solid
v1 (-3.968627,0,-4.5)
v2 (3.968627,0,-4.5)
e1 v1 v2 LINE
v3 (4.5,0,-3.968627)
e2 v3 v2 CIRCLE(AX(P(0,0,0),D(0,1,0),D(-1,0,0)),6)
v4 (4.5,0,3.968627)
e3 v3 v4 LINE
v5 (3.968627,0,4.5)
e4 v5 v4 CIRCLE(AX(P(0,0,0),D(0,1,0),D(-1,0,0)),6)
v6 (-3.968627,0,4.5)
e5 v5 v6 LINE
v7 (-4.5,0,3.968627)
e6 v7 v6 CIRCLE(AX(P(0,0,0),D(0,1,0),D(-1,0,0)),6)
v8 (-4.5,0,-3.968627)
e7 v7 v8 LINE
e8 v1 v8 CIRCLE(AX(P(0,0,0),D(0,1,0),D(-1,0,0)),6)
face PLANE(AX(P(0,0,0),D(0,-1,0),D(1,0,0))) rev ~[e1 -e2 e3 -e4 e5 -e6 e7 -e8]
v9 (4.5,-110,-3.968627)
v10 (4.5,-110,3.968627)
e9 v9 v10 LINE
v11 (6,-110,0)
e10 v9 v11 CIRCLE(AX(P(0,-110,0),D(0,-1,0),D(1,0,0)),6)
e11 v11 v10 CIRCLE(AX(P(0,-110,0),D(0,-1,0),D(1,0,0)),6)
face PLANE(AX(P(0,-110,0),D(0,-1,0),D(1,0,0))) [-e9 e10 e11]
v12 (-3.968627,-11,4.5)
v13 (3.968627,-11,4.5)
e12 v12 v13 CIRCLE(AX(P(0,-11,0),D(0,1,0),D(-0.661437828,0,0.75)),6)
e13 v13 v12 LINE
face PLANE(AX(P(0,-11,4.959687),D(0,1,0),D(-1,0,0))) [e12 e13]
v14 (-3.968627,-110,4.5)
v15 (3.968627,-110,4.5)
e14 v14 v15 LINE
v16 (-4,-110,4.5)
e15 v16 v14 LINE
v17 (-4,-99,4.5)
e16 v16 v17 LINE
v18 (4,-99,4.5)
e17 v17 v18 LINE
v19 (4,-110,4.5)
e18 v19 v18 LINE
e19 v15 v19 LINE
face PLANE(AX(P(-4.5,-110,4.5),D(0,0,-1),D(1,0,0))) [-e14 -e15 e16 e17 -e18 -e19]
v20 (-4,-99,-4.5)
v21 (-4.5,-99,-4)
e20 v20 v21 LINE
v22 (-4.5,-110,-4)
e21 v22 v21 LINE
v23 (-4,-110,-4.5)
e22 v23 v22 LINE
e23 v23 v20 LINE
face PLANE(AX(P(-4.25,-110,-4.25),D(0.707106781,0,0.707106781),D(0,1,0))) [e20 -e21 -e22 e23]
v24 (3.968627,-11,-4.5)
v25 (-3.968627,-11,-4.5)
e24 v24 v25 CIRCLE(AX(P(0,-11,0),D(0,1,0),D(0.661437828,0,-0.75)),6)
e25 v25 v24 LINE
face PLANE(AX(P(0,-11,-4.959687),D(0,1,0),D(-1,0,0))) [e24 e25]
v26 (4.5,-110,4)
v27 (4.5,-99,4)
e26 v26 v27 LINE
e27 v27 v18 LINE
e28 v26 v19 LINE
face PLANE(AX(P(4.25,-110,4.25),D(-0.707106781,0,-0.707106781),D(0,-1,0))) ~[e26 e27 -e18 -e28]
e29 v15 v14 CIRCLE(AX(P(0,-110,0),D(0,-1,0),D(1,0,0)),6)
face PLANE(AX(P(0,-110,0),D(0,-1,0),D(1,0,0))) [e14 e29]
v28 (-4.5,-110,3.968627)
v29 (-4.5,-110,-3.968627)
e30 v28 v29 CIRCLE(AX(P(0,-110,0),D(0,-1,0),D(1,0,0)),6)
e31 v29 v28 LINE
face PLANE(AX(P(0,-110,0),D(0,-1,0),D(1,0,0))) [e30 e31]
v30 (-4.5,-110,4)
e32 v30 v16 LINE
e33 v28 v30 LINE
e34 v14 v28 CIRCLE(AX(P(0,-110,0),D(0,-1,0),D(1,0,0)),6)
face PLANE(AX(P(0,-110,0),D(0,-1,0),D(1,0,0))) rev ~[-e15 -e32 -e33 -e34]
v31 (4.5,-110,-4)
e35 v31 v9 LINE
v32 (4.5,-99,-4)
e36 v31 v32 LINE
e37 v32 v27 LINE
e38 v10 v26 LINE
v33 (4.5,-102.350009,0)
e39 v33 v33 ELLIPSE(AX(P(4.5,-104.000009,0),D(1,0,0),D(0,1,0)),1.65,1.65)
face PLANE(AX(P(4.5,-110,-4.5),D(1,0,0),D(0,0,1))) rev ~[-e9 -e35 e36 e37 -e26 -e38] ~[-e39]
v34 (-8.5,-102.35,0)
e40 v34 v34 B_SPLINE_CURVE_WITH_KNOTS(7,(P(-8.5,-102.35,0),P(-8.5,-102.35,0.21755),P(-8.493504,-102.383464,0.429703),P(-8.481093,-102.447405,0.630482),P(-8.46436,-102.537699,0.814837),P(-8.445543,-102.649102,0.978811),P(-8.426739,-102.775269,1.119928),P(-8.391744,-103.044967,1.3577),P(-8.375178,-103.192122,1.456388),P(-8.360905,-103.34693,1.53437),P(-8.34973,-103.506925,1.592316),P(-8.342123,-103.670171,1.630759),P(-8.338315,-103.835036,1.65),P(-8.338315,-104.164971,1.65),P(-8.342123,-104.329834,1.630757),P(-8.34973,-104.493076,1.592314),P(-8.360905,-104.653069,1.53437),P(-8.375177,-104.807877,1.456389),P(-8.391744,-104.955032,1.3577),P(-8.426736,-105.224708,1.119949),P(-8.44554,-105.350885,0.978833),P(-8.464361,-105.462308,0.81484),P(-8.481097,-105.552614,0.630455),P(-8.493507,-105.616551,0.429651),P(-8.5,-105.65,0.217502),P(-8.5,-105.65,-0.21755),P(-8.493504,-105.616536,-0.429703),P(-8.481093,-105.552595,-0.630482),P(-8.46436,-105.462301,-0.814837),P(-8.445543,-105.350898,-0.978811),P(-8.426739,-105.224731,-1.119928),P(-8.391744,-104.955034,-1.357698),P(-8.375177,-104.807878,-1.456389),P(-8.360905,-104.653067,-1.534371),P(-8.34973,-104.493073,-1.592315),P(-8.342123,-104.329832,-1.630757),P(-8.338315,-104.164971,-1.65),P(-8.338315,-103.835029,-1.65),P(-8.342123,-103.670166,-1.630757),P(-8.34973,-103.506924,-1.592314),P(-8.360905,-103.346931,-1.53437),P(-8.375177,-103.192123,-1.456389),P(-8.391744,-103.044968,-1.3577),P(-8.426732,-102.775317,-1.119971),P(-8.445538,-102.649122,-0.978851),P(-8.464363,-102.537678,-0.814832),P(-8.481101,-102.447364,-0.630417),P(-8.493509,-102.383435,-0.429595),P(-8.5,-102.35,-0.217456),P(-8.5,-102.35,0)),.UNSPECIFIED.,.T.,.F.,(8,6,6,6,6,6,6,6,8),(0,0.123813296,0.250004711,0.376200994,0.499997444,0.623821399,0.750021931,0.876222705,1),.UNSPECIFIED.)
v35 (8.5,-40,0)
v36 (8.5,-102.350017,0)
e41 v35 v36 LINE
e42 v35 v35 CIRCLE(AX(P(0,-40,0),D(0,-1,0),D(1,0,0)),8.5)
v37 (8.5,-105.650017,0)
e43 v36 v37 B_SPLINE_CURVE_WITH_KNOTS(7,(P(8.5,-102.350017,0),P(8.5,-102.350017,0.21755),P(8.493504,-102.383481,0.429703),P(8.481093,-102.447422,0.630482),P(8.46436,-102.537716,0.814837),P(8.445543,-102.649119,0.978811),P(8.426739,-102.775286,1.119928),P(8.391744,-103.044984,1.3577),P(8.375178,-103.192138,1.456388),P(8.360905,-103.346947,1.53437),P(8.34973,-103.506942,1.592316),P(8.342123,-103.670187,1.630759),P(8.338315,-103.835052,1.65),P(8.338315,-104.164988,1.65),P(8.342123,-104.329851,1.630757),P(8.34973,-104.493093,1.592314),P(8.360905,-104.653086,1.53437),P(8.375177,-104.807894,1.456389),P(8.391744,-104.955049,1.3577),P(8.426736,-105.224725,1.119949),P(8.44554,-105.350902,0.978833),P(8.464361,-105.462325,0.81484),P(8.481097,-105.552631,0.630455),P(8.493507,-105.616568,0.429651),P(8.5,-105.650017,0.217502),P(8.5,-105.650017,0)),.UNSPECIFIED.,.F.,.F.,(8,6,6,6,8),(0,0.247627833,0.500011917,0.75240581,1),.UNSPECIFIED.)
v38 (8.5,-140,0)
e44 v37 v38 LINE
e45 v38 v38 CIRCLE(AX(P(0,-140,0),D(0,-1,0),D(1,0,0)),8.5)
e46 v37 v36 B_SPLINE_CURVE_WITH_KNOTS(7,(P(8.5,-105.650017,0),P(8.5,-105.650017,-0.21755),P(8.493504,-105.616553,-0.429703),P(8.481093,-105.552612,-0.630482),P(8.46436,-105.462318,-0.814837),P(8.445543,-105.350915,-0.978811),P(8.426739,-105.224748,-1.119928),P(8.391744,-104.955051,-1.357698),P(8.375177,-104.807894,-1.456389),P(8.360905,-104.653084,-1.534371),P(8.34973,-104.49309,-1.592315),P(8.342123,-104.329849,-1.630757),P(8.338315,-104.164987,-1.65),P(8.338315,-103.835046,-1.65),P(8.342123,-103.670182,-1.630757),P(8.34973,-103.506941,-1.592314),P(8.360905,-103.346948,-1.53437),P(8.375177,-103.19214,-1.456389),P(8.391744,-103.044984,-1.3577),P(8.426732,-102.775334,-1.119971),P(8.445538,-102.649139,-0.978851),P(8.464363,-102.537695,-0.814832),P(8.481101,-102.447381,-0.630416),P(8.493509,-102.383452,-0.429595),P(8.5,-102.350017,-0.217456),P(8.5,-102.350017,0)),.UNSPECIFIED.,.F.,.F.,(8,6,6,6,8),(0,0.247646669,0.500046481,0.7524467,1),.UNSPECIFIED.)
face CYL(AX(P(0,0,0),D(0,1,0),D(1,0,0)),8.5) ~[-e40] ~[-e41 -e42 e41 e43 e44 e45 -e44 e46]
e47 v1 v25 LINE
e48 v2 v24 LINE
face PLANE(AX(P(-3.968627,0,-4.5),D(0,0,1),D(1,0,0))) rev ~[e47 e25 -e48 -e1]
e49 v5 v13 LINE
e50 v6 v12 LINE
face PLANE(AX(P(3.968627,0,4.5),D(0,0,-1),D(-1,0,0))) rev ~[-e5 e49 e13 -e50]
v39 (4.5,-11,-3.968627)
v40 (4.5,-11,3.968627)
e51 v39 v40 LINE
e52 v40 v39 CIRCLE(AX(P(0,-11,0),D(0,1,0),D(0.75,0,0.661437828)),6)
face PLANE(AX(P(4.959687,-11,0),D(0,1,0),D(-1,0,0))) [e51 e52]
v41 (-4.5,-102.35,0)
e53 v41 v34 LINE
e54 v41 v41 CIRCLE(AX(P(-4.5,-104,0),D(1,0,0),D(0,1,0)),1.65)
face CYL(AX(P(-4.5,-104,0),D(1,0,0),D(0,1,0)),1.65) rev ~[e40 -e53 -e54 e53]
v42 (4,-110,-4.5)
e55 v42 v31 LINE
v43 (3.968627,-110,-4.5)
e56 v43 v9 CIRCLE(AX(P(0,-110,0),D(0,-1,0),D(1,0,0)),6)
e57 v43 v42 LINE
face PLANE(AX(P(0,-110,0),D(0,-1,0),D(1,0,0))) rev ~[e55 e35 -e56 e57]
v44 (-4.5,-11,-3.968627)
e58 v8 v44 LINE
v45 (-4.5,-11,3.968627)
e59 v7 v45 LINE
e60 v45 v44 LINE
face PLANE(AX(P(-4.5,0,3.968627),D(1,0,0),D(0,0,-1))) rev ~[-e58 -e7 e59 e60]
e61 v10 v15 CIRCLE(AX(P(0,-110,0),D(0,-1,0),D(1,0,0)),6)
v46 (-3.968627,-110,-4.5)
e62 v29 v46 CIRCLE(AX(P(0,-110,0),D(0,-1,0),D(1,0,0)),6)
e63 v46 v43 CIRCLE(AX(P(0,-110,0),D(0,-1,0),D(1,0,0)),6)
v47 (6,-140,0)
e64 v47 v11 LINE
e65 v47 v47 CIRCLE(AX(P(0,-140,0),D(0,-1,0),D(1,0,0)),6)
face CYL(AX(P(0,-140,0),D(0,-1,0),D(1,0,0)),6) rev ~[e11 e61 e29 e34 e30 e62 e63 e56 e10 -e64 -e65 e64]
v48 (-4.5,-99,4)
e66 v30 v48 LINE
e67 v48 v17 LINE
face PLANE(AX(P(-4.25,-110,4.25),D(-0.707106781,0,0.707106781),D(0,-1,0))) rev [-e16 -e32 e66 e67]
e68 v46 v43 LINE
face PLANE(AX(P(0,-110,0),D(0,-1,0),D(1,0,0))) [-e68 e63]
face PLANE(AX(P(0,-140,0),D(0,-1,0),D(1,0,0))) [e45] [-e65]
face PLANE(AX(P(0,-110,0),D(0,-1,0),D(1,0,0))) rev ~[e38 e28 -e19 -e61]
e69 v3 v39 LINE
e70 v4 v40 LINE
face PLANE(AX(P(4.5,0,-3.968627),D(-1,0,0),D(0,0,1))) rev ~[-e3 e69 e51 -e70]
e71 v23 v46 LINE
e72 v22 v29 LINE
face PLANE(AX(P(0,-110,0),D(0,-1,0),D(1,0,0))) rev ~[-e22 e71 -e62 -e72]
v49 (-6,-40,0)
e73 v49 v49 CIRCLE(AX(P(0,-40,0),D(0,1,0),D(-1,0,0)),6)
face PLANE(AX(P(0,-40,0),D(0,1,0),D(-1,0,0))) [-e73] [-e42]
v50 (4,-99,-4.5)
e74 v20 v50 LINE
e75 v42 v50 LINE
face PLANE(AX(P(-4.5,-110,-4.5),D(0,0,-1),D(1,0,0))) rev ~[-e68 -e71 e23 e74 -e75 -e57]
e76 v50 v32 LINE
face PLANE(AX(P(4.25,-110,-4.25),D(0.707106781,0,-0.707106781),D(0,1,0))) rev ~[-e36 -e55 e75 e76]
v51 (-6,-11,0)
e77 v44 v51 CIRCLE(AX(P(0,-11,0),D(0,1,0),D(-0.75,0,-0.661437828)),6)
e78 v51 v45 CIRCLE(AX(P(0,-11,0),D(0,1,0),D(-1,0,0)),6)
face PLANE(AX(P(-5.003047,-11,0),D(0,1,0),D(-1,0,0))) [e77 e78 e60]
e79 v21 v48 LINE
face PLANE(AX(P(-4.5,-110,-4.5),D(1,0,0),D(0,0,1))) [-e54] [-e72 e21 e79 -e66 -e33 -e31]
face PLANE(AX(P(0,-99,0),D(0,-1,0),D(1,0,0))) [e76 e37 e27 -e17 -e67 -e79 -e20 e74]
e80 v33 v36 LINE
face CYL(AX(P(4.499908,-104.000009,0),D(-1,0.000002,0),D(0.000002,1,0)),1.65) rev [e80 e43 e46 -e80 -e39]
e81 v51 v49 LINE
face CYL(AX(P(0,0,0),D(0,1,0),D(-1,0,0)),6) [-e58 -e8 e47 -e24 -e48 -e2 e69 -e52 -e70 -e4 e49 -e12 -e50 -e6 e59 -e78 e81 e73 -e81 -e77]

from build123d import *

# Parameters (mm, degrees)
F0_R      = 8.5
F1_DEPTH  = 140
F2_R      = 6
F3_DEPTH  = 30
F4_W      = 9
F4_H      = 9
F5_DEPTH  = 11
F6_SIZE   = 0.5
F7_SIZE   = 0.5
F8_SIZE   = 0.5
F9_R      = 1.65
F10_DEPTH = 25
F11_R     = 8.5
F11_R_2   = 6
F12_DEPTH = 40
F14_DEPTH = 11


# Not quite as in the source:
# - a pattern or mirror of a feature is missing from the dataset's text; its kind, count and spacing are read off the source's solid


with BuildPart() as f1:
    # F0 (on Front) → F1 (new body)
    with BuildSketch(Plane.XZ):
        Circle(F0_R)
    extrude(amount=F1_DEPTH)

    # F2 (on face) → F3 (cut)
    with BuildSketch(Plane.XZ.offset(140)):
        Circle(F2_R)
    extrude(amount=-F3_DEPTH, mode=Mode.SUBTRACT)

    # F4 (on face) → F5 (cut)
    with BuildSketch(Plane.XZ.offset(110)):
        Rectangle(F4_W, F4_H)
    extrude(amount=-F5_DEPTH, mode=Mode.SUBTRACT)

    # F6
    f6_edges = [f1.edges().sort_by_distance(p)[0] for p in [
        (-4.5, -104.5, -4.5),
    ]]
    chamfer(f6_edges, length=F6_SIZE)

    # F7
    f7_edges = [f1.edges().sort_by_distance(p)[0] for p in [
        (4.5, -104.5, -4.5),
    ]]
    chamfer(f7_edges, length=F7_SIZE)

    # F8
    f8_edges = [f1.edges().sort_by_distance(p)[0] for p in [
        (4.5, -104.5, 4.5),
        (-4.5, -104.5, 4.5),
    ]]
    chamfer(f8_edges, length=F8_SIZE)

    # F9 (on face) → F10 (cut)
    with BuildSketch(Plane.YZ.offset(-4.5)):
        with Locations((-104, 0)):
            Circle(F9_R)
    f10 = extrude(amount=-F10_DEPTH, mode=Mode.SUBTRACT)

    # F10_copies: F10 across plane
    add(f10.mirror(Plane(origin=(5.8e-05, 0, 0), x_dir=(1e-06, 1, 0), z_dir=(1, -1e-06, 0))), mode=Mode.SUBTRACT)

    # F11 (on face) → F12 (cut)
    with BuildSketch(Plane(origin=(0, 0, 0), x_dir=(-1, 0, 0), z_dir=(0, 1, 0))):
        Circle(F11_R)
        Circle(F11_R_2, mode=Mode.SUBTRACT)
    extrude(amount=-F12_DEPTH, mode=Mode.SUBTRACT)

    # F13 (on face) → F14 (cut)
    with BuildSketch(Plane(origin=(0, 0, 0), x_dir=(-1, 0, 0), z_dir=(0, 1, 0))):
        with BuildLine():
            Line((3.9686269666, -4.5), (-3.9686269666, -4.5))
            ThreePointArc((-3.9686269666, -4.5), (0, -6), (3.9686269666, -4.5))
        make_face()
        with BuildLine():
            ThreePointArc((-4.5, 3.9686269666), (-6, 0), (-4.5, -3.9686269666))
            Line((-4.5, -3.9686269666), (-4.5, 3.9686269666))
        make_face()
        with BuildLine():
            Line((-4.5, 4.5), (-4.5, 3.9686269666))
            ThreePointArc((-4.5, 3.9686269666), (-4.2426406871, 4.2426406871), (-3.9686269666, 4.5))
            Line((-3.9686269666, 4.5), (-4.5, 4.5))
        make_face()
        with BuildLine():
            Line((4.5, 3.9686269666), (4.5, -3.9686269666))
            ThreePointArc((4.5, -3.9686269666), (5.6124860802, -2.1213203436), (6, 0))
            ThreePointArc((6, 0), (5.6124860802, 2.1213203436), (4.5, 3.9686269666))
        make_face()
        with BuildLine():
            ThreePointArc((3.9686269666, 4.5), (0, 6), (-3.9686269666, 4.5))
            Line((-3.9686269666, 4.5), (3.9686269666, 4.5))
        make_face()
        with BuildLine():
            ThreePointArc((3.9686269666, 4.5), (4.2426406871, 4.2426406871), (4.5, 3.9686269666))
            Line((4.5, 3.9686269666), (4.5, 4.5))
            Line((4.5, 4.5), (3.9686269666, 4.5))
        make_face()
    extrude(amount=-F14_DEPTH, mode=Mode.SUBTRACT)


solid = f1.part
